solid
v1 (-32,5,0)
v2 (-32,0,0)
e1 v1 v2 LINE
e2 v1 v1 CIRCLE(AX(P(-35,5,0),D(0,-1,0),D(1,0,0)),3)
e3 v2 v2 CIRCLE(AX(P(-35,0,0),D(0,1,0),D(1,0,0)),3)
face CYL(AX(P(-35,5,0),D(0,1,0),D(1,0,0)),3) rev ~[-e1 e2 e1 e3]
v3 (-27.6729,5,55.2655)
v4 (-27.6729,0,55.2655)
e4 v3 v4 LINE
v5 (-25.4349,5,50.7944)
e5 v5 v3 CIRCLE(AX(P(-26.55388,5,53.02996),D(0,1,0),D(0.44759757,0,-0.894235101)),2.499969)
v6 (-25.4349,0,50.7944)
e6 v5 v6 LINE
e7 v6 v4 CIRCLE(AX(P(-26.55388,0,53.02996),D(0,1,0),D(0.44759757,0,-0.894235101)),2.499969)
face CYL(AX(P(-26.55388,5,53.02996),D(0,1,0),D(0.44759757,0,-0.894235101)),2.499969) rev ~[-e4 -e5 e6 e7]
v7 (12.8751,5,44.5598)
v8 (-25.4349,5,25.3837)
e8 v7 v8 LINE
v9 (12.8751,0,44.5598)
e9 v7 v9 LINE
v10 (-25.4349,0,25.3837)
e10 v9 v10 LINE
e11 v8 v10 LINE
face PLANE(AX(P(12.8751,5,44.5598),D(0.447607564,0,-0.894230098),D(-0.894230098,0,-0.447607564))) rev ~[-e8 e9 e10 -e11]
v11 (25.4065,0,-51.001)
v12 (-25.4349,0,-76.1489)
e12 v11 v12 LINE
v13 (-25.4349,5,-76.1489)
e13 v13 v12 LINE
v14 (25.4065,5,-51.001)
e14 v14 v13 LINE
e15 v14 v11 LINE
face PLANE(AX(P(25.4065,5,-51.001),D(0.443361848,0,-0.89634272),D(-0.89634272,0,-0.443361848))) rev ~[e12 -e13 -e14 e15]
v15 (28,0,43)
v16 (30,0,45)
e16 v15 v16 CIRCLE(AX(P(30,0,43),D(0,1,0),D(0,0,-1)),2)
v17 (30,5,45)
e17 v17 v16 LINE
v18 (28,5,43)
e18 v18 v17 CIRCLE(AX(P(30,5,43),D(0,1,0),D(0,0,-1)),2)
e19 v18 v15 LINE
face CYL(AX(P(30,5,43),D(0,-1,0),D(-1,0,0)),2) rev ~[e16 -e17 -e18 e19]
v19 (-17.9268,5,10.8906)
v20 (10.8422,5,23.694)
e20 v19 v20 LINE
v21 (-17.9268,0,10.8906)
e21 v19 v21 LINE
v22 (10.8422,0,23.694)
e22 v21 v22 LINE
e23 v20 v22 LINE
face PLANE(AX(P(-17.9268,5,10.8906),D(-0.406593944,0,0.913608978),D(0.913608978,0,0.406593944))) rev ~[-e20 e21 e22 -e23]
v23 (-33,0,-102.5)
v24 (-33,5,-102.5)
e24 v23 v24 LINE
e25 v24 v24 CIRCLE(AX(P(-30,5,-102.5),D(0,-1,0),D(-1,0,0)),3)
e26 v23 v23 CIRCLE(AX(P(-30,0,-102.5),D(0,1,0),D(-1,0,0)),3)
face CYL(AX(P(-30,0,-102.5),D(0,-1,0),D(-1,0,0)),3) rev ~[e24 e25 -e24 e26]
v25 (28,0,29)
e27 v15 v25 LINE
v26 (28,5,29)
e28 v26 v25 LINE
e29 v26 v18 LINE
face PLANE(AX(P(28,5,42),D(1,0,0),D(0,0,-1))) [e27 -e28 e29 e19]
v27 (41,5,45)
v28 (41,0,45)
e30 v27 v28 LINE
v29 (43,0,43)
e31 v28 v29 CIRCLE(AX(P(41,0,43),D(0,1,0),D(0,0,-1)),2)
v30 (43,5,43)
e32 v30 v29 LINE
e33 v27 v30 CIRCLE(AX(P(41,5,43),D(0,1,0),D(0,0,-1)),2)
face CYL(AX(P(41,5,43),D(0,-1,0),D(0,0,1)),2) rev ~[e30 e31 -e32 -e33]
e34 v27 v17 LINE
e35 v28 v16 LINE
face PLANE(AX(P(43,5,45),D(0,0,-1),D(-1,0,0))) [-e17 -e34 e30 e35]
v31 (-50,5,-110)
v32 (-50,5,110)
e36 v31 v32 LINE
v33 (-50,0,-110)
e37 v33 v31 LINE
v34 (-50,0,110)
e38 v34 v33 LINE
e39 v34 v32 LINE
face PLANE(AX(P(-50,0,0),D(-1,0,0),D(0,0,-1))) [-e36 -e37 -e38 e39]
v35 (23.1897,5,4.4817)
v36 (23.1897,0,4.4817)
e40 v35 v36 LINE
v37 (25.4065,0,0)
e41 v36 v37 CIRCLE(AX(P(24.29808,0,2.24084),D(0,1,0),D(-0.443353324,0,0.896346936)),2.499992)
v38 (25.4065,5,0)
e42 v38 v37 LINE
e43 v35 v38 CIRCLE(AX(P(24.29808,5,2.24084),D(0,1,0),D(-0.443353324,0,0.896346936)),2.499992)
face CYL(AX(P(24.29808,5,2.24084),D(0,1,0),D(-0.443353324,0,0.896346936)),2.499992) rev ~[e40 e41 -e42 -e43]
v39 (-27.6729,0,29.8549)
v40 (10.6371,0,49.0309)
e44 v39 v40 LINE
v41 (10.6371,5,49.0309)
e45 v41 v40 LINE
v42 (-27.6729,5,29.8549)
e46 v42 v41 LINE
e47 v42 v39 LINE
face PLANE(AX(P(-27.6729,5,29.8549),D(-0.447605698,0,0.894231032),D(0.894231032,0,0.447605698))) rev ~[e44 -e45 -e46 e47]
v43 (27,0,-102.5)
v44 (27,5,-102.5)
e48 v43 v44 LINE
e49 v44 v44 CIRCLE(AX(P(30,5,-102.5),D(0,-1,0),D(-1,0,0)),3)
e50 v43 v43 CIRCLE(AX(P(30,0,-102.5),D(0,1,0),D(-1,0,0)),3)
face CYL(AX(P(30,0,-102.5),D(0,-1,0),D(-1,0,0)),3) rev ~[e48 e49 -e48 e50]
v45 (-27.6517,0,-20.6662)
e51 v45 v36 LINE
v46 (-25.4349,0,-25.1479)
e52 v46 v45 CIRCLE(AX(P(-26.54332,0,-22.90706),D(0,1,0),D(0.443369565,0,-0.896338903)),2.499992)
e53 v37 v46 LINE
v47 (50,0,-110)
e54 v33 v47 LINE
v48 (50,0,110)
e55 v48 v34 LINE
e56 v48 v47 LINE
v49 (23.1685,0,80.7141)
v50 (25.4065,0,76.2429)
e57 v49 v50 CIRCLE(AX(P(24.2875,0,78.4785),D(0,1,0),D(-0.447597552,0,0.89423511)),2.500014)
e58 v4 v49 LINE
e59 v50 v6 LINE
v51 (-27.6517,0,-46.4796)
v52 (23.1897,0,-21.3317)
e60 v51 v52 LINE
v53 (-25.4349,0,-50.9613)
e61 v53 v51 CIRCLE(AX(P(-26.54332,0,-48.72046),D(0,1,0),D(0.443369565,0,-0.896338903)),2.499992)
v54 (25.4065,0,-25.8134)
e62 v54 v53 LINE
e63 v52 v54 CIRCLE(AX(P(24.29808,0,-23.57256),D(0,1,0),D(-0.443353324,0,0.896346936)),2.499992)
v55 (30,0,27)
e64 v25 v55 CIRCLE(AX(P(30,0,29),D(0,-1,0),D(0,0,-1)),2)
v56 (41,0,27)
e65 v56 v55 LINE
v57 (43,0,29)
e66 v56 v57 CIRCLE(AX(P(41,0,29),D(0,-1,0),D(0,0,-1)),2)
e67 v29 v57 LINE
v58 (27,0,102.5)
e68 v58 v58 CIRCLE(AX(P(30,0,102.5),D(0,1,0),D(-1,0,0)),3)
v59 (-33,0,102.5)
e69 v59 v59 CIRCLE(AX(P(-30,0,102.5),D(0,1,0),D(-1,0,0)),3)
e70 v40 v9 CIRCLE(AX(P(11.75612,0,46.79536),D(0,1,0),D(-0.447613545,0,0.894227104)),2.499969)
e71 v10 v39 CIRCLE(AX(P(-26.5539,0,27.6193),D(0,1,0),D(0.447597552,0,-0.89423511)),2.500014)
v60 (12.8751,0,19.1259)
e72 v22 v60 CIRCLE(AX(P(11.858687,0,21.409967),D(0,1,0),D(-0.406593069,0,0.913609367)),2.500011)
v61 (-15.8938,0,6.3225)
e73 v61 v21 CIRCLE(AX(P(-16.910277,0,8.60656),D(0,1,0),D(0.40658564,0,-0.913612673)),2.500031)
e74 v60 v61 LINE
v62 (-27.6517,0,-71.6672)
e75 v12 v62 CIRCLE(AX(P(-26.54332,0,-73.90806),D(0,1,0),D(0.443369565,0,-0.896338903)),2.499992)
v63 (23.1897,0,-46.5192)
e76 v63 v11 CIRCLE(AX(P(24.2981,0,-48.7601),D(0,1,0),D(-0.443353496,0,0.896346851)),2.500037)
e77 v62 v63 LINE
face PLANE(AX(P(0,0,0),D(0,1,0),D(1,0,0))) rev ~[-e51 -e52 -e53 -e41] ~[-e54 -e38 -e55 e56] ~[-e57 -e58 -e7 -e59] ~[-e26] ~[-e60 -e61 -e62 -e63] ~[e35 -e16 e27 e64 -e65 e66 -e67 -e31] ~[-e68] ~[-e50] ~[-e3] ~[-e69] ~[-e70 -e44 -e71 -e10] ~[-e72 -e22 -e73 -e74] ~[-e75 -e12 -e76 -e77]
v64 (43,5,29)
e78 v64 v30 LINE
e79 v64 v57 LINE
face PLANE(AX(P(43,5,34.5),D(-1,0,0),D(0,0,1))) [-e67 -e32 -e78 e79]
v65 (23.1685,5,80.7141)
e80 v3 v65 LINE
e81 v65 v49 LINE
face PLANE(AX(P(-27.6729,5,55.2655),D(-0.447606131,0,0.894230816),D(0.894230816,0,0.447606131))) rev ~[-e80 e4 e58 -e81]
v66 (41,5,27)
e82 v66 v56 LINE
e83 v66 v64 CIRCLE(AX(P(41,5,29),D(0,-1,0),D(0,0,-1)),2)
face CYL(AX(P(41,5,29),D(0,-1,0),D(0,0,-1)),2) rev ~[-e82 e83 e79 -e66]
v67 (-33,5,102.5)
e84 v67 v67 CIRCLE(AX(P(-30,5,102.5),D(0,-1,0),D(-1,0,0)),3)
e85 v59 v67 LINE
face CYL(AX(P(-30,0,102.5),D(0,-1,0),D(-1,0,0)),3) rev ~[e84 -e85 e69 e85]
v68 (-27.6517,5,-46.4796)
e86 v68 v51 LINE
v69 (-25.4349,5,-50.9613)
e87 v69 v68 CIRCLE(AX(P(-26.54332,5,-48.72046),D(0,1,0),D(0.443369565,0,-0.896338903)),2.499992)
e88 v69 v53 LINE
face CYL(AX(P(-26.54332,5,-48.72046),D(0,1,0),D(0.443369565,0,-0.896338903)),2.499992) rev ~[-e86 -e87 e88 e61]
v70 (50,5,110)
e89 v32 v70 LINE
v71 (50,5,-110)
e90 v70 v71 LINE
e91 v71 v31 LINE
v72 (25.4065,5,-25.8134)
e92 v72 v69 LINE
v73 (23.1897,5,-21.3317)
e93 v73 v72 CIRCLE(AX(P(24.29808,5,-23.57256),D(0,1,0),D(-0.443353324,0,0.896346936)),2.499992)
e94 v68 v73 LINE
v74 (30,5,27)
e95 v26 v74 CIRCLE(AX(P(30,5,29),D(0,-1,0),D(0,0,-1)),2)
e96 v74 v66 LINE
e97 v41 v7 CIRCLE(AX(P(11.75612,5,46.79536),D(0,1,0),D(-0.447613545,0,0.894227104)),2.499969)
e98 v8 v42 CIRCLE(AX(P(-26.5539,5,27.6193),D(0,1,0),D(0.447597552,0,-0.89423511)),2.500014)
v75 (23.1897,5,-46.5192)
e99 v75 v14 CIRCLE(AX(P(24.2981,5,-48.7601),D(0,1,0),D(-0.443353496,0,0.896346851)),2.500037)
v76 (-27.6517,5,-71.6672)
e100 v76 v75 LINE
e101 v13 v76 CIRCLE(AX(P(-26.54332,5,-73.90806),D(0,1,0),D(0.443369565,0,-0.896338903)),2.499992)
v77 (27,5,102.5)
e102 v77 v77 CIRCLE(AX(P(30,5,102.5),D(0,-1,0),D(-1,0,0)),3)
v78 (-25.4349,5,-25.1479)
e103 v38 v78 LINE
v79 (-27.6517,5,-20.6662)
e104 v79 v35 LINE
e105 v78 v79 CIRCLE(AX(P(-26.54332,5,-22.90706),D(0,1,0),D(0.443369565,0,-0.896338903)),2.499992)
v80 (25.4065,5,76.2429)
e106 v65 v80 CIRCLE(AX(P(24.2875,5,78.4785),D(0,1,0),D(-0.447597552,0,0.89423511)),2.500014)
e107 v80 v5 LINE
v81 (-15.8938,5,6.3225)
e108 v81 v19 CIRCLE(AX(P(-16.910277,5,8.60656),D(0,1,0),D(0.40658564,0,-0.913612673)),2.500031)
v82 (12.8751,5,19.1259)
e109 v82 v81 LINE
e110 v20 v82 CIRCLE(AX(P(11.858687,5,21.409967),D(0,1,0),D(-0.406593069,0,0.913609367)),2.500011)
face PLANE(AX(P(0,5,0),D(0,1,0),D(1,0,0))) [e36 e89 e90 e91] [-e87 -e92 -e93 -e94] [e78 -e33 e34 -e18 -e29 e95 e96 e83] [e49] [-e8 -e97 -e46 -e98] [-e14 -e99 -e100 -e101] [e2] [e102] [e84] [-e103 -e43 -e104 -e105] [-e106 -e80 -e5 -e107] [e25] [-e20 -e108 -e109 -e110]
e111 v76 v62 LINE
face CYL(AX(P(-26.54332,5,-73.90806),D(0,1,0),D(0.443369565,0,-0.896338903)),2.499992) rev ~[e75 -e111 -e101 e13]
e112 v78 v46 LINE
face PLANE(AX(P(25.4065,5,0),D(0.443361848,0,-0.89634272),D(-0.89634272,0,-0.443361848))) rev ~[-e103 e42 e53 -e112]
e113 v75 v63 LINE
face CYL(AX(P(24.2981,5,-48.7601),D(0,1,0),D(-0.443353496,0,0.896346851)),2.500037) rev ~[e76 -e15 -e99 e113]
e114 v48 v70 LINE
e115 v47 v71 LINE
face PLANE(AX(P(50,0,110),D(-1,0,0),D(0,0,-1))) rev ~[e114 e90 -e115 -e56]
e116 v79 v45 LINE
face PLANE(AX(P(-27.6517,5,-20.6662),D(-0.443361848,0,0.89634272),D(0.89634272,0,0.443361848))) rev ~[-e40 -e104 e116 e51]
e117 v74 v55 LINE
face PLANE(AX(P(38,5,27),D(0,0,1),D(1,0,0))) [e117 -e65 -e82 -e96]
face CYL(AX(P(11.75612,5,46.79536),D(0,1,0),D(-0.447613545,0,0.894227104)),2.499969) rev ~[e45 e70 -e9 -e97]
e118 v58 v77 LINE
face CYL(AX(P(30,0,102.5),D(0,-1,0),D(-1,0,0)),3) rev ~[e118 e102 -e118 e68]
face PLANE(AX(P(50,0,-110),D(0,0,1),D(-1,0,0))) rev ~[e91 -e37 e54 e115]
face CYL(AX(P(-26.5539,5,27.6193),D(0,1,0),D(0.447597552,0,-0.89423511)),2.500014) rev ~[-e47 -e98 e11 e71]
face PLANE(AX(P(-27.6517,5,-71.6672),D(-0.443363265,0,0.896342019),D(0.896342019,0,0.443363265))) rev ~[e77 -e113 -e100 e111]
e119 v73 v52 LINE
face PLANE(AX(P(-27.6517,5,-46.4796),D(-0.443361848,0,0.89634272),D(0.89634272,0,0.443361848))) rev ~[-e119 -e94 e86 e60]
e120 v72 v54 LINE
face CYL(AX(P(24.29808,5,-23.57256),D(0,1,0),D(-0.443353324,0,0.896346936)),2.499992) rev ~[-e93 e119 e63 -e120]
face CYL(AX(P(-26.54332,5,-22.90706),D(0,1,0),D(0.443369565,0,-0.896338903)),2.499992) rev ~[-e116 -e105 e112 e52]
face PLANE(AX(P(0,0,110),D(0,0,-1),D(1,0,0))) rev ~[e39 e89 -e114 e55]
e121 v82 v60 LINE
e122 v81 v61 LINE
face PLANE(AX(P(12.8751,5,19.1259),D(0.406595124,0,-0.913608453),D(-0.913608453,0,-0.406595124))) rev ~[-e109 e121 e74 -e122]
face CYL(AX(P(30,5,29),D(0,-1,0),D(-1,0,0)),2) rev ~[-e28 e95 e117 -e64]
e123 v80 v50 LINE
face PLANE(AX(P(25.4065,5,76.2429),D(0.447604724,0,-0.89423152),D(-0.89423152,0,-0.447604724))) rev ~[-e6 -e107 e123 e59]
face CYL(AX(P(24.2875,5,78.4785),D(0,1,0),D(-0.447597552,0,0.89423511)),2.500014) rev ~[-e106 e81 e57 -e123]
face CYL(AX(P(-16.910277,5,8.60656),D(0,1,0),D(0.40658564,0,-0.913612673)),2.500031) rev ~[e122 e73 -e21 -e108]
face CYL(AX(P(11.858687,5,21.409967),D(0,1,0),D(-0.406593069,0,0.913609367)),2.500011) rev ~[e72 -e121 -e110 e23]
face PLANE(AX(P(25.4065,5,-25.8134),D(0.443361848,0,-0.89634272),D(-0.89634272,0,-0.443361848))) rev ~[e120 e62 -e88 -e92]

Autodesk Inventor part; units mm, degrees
ref_plane "YZ Plane" through (0, 0, 0) normal (1, 0, 0) x (0, 1, 0)
ref_plane "XZ Plane" through (0, 0, 0) normal (0, 1, 0) x (-1, 0, 0)
ref_plane "XY Plane" through (0, 0, 0) normal (0, 0, 1) x (1, 0, 0)
sketch "Sketch1" plane through (0, 0, 0) normal (0, 1, 0) x (-1, 0, 0)
  line L0 (0, 0) -> (0, 110)
  line L1 (0, 110) -> (50, 110)
  line L2 (50, 110) -> (50, -110)
  line L3 (50, -110) -> (0, -110)
  line L4 (0, -110) -> (0, 0)
  line L5 (50, 0) -> (0, 0)
  line L6 (50, 110) -> (50, 102.5)
  line L7 (50, 102.5) -> (30, 102.5)
  line L8 (0, 110) -> (-50, 110)
  line L9 (-50, 110) -> (-50, -110)
  line L10 (-50, -110) -> (0, -110)
  circle A0 centre (30, 102.5) radius 3
  line L11 (30, 102.5) -> (-30, 102.5)
  circle A1 centre (-30, 102.5) radius 3
  circle A2 centre (30, -102.5) radius 3
  circle A3 centre (-30, -102.5) radius 3
  line L12 (30, 102.5) -> (30, -102.5)
  line L13 (-30, 102.5) -> (-30, -102.5)
  line L14 (30, 76.2) -> (-30, 50.8) construction
  line L15 (28.0508, 80.8044) -> (-31.9492, 55.4044)
  line L16 (-28.0508, 46.1956) -> (31.9492, 71.5956)
  arc A4 (31.9492, 71.5956) -> (28.0508, 80.8044) centre (30, 76.2) ccw
  arc A5 (-31.9492, 55.4044) -> (-28.0508, 46.1956) centre (-30, 50.8) ccw
  line L17 (30, 50.8) -> (-30, 25.4) construction
  line L18 (28.0508, 55.4044) -> (-31.9492, 30.0044)
  line L19 (-28.0508, 20.7956) -> (31.9492, 46.1956)
  arc A6 (31.9492, 46.1956) -> (28.0508, 55.4044) centre (30, 50.8) ccw
  arc A7 (-31.9492, 30.0044) -> (-28.0508, 20.7956) centre (-30, 25.4) ccw
  line L20 (30, 25.4) -> (-30, 0) construction
  line L21 (28.0508, 30.0044) -> (-31.9492, 4.6044)
  line L22 (-28.0508, -4.6044) -> (31.9492, 20.7956)
  arc A8 (31.9492, 20.7956) -> (28.0508, 30.0044) centre (30, 25.4) ccw
  arc A9 (-31.9492, 4.6044) -> (-28.0508, -4.6044) centre (-30, 0) ccw
  line L23 (30, 0) -> (-30, -25.4) construction
  line L24 (28.0508, 4.6044) -> (-31.9492, -20.7956)
  line L25 (-28.0508, -30.0044) -> (31.9492, -4.6044)
  arc A10 (31.9492, -4.6044) -> (28.0508, 4.6044) centre (30, 0) ccw
  arc A11 (-31.9492, -20.7956) -> (-28.0508, -30.0044) centre (-30, -25.4) ccw
  line L26 (30, -25.4) -> (-30, -50.8) construction
  line L27 (28.0508, -20.7956) -> (-31.9492, -46.1956)
  line L28 (-28.0508, -55.4044) -> (31.9492, -30.0044)
  arc A12 (31.9492, -30.0044) -> (28.0508, -20.7956) centre (30, -25.4) ccw
  arc A13 (-31.9492, -46.1956) -> (-28.0508, -55.4044) centre (-30, -50.8) ccw
  line L29 (30, -50.8) -> (-30, -76.2) construction
  line L30 (28.0508, -46.1956) -> (-31.9492, -71.5956)
  line L31 (-28.0508, -80.8044) -> (31.9492, -55.4044)
  arc A14 (31.9492, -55.4044) -> (28.0508, -46.1956) centre (30, -50.8) ccw
  arc A15 (-31.9492, -71.5956) -> (-28.0508, -80.8044) centre (-30, -76.2) ccw
  point P0 (0, 63.5)
  point P1 (0, 38.1)
  point P2 (0, 12.7)
  point P3 (0, -12.7)
  point P4 (0, -38.1)
  point P5 (0, -63.5)
  dimension "d0" = 110
  dimension "d1" = 50
  dimension "d2" = 220
  dimension "d3" = 7.5
  dimension "d4" = 20
  dimension "d5" = 50
  dimension "d6" = 6
  dimension "d7" = 60
  dimension "d8" = 6
  dimension "d9" = 10
  dimension "d10" = 10
  dimension "d11" = 10
  dimension "d12" = 10
  dimension "d13" = 10
  dimension "d14" = 10
extrude "Extrusion1" add sketch "Sketch1" along normal blind 5 contours L4 L24 L13 A9 L22 L0 | L5 L24 L4 | L0 L22 L12 A10 L24 L5 | L21 L13 A7 L19 L0 | L0 L19 L12 A8 L21 | L22 A8 L12 L19 A6 L16 A4 A0 L7 L2 L5 A10 | L25 L12 A12 L27 L4 | L4 L27 L13 A11 L25 | L24 A11 L13 L27 A13 L30 A15 L31 L4 L10 L9 L8 L0 L11 A1 L15 A5 L18 A7 L21 A9 | L25 A10 L5 L2 L3 L4 L31 A14 L12 L28 A12 | L18 L13 A5 L16 L0 | L0 L16 L12 A6 L18 | L28 L12 A14 L30 L4 | L4 L30 L13 A13 L28 | L7 A0 L11 L0 L1 L2 | L15 L13 A1 L11 L0 | L0 L11 A0 L12 A4 L15
sketch "Sketch2" plane through (0, 5, 0) normal (0, 1, 0) x (1, 0, 0)
  line L0 (31.9492, -55.4044) -> (-28.0508, -80.8044) projected
  line L1 (-28.0508, -80.8044) -> (31.9492, -55.4044)
  line L2 (-31.9492, -71.5956) -> (28.0508, -46.1956) projected
  line L3 (-31.9492, -71.5956) -> (28.0508, -46.1956)
  arc A0 (31.9492, -55.4044) -> (28.0508, -46.1956) centre (30, -50.8) ccw projected
  arc A1 (31.9492, -55.4044) -> (28.0508, -46.1956) centre (30, -50.8) ccw
  arc A2 (-31.9492, -71.5956) -> (-28.0508, -80.8044) centre (-30, -76.2) ccw projected
  arc A3 (-31.9492, -71.5956) -> (-28.0508, -80.8044) centre (-30, -76.2) ccw
  arc A4 (-31.9492, -46.1956) -> (-28.0508, -55.4044) centre (-30, -50.8) ccw projected
  arc A5 (-31.9492, -46.1956) -> (-28.0508, -55.4044) centre (-30, -50.8) ccw
  arc A6 (31.9492, -30.0044) -> (28.0508, -20.7956) centre (30, -25.4) ccw projected
  arc A7 (31.9492, -30.0044) -> (28.0508, -20.7956) centre (30, -25.4) ccw
  line L4 (31.9492, -30.0044) -> (-28.0508, -55.4044)
  line L5 (-31.9492, -46.1956) -> (28.0508, -20.7956)
  point P0 (0, 0)
extrude "Extrusion2" add sketch "Sketch2" against normal blind 5
sketch "Sketch3" plane through (0, 5, 0) normal (0, 1, 0) x (1, 0, 0)
  line L0 (50, -110) -> (50, 110) projected
  line L1 (-50, -110) -> (50, -110) projected
  line L2 (50, -110) -> (-50, -110)
  line L3 (50, -110) -> (25, -110)
  line L4 (25, -110) -> (25, -50)
  line L5 (25, -50) -> (17.5, -50)
  line L6 (17.5, -50) -> (17.5, -35)
  line L7 (17.5, -35) -> (32.5, -35)
  line L8 (32.5, -35) -> (32.5, -50)
  line L9 (32.5, -50) -> (25, -50)
  line L10 (-25.409, -50.782) -> (-0.009, -38.082) construction
  line L11 (-23.1729, -55.2541) -> (2.2271, -42.5541)
  line L12 (-2.2451, -33.6099) -> (-27.6451, -46.3099)
  arc A0 (-27.6451, -46.3099) -> (-23.1729, -55.2541) centre (-25.409, -50.782) ccw
  arc A1 (2.2271, -42.5541) -> (-2.2451, -33.6099) centre (-0.009, -38.082) ccw
  line L13 (-25.409, -76.2) -> (-0.009, -63.5) construction
  line L14 (-23.1729, -80.6721) -> (2.2271, -67.9721)
  line L15 (-2.2451, -59.0279) -> (-27.6451, -71.7279)
  arc A2 (-27.6451, -71.7279) -> (-23.1729, -80.6721) centre (-25.409, -76.2) ccw
  arc A3 (2.2271, -67.9721) -> (-2.2451, -59.0279) centre (-0.009, -63.5) ccw
  point P0 (0, 0)
  point P1 (-12.709, -44.432)
  point P2 (-12.709, -69.85)
  dimension "d19" = 25
  dimension "d20" = 60
  dimension "d21" = 7.5
  dimension "d22" = 15
  dimension "d23" = 15
  dimension "d24" = 10
  dimension "d25" = 10
extrude "Extrusion3" cut sketch "Sketch3" against normal blind 5
fillet "Face Fillet1" radius 2 1 edges at (17.5, 2.5, 50)
fillet "Face Fillet2" radius 2 1 edges at (32.5, 2.5, 50)
fillet "Face Fillet3" radius 2 1 edges at (17.5, 2.5, 35)
fillet "Face Fillet4" radius 2 1 edges at (32.5, 2.5, 35)
sketch "Sketch4" plane through (0, 5, 0) normal (0, 1, 0) x (1, 0, 0)
  line L0 (-31.9492, 4.6044) -> (28.0508, 30.0044) projected
  line L1 (-31.9492, 4.6044) -> (28.0508, 30.0044)
  line L2 (31.9492, 20.7956) -> (-28.0508, -4.6044) projected
  line L3 (31.9492, 20.7956) -> (-28.0508, -4.6044)
  arc A0 (-31.9492, 4.6044) -> (-28.0508, -4.6044) centre (-30, 0) ccw
  arc A1 (31.9492, 20.7956) -> (28.0508, 30.0044) centre (30, 25.4) ccw projected
  arc A2 (31.9492, 20.7956) -> (28.0508, 30.0044) centre (30, 25.4) ccw
  point P0 (0, 0)
extrude "Extrusion4" add sketch "Sketch4" against normal blind 5
sketch "Sketch5" plane through (0, 5, 0) normal (0, 1, 0) x (1, 0, 0)
  line L0 (-50, 110) -> (-50, -110) projected
  line L1 (-50, -110) -> (-50, 0)
  line L2 (-50, 0) -> (-35, 0)
  circle A0 centre (-35, 0) radius 3
  line L3 (25.3921, 25.4185) -> (-19.0579, 6.3685) construction
  line L4 (23.4225, 30.0142) -> (-21.0275, 10.9642)
  line L5 (-17.0883, 1.7728) -> (27.3617, 20.8228)
  arc A1 (27.3617, 20.8228) -> (23.4225, 30.0142) centre (25.3921, 25.4185) ccw
  arc A2 (-21.0275, 10.9642) -> (-17.0883, 1.7728) centre (-19.0579, 6.3685) ccw
  point P0 (0, 0)
  point P1 (3.1671, 15.8935)
  dimension "d34" = 15
  dimension "d35" = 6
  dimension "d36" = 10
extrude "Extrusion5" cut sketch "Sketch5" against normal blind 5
sketch "Sketch6" plane through (0, 5, 0) normal (0, 1, 0) x (1, 0, 0)
  circle A0 centre (30, -102.5) radius 3 projected
  line L0 (30, -102.5) -> (30, -95)
  line L1 (30, -95) -> (30, -42)
  line L2 (30, -42) -> (40, -42)
  line L3 (40, -42) -> (25, -42)
  line L4 (25, -42) -> (25, -27)
  line L5 (25, -27) -> (40, -27)
  line L6 (40, -27) -> (40, -42)
  line L7 (32.5, -48) -> (32.5, -42)
  line L8 (32.5, -37) -> (32.5, -48) projected
  line L9 (19.5, -35) -> (30.5, -35) projected
  line L10 (25, -35) -> (19.5, -35)
  line L11 (30.5, -50) -> (19.5, -50)
  line L12 (17.5, -48) -> (17.5, -37)
  arc A1 (19.5, -35) -> (17.5, -37) centre (19.5, -37) ccw projected
  arc A2 (17.5, -48) -> (19.5, -50) centre (19.5, -48) ccw projected
  arc A3 (17.5, -48) -> (19.5, -50) centre (19.5, -48) ccw
  arc A4 (19.5, -35) -> (17.5, -37) centre (19.5, -37) ccw
  arc A5 (30.5, -50) -> (32.5, -48) centre (30.5, -48) ccw projected
  arc A6 (30.5, -50) -> (32.5, -48) centre (30.5, -48) ccw
  line L13 (40, -27) -> (43, -27)
  line L14 (43, -27) -> (43, -45)
  line L15 (43, -45) -> (25, -45)
  line L16 (25, -45) -> (25, -27)
  point P0 (0, 0)
  dimension "d39" = 7.5
  dimension "d40" = 53
  dimension "d41" = 10
  dimension "d42" = 15
  dimension "d43" = 15
  dimension "d50" = 3
  dimension "d51" = 18
extrude "Extrusion6" cut sketch "Sketch6" against normal blind 5 contours L3 L4 L5 L6 L2
sketch "Sketch7" plane through (0, 5, 0) normal (0, 1, 0) x (1, 0, 0)
  line L0 (32.5, -42) -> (40, -42) projected
  line L1 (40, -42) -> (25, -42)
  line L2 (40, -27) -> (25, -27) projected
  line L3 (25, -42) -> (25, -27)
  line L4 (32.5, -42) -> (32.5, -48) projected
  line L5 (32.5, -42) -> (32.5, -48)
  line L6 (19.5, -35) -> (25, -35) projected
  line L7 (25, -35) -> (19.5, -35)
  arc A0 (19.5, -35) -> (17.5, -37) centre (19.5, -37) ccw projected
  line L8 (17.5, -37) -> (17.5, -48)
  line L9 (30.5, -50) -> (19.5, -50) projected
  line L10 (19.5, -50) -> (30.5, -50)
  arc A1 (17.5, -48) -> (19.5, -50) centre (19.5, -48) ccw projected
  arc A2 (17.5, -48) -> (19.5, -50) centre (19.5, -48) ccw
  arc A3 (19.5, -35) -> (17.5, -37) centre (19.5, -37) ccw
  arc A4 (30.5, -50) -> (32.5, -48) centre (30.5, -48) ccw
  point P0 (0, 0)
  dimension "d46" = 15
extrude "Extrusion7" add sketch "Sketch7" against normal blind 5
fillet "Fillet1" radius 2 4 edges at (25, 2.5, 42) (25, 2.5, 27) (40, 2.5, 42) (40, 2.5, 27)
sketch "Sketch8" plane through (0, 5, 0) normal (0, 1, 0) x (1, 0, 0)
  line L0 (40, -29) -> (40, -40) projected
  line L1 (40, -34.5) -> (43, -34.5)
  line L2 (38, -27) -> (27, -27) projected
  line L3 (32.5, -27) -> (49.9944, -27)
  line L4 (43, -34.5) -> (43, -27)
  line L5 (43, -27) -> (43, -45)
  line L6 (43, -45) -> (25, -45)
  line L7 (25, -45) -> (25, -27)
  line L8 (25, -27) -> (43, -27)
  line L9 (43, -45) -> (28, -45)
  line L10 (28, -45) -> (28, -27)
  point P0 (0, 0)
  dimension "d52" = 3
  dimension "d53" = 18
  dimension "d54" = 18
  dimension "d55" = 15
extrude "Extrusion8" cut sketch "Sketch8" against normal blind 10 contours L3 L4 L5 L6 L10 L2
sketch "Sketch9" plane through (0, 5, 0) normal (0, 1, 0) x (1, 0, 0)
  line L0 (27, -42) -> (28, -42) projected
  line L1 (28, -42) -> (28, -27)
  line L2 (43, -27) -> (27, -27) projected
  line L3 (28, -42) -> (28, -45) projected
  line L4 (28, -42) -> (27, -42)
  line L5 (28, -27) -> (27, -27)
  line L6 (25, -29) -> (25, -40) projected
  line L7 (25, -40) -> (25, -29)
  arc A0 (25, -40) -> (27, -42) centre (27, -40) ccw projected
  arc A1 (25, -40) -> (27, -42) centre (27, -40) ccw
  arc A2 (27, -27) -> (25, -29) centre (27, -29) ccw
  point P0 (0, 0)
extrude "Extrusion9" add sketch "Sketch9" against normal blind 5
fillet "Fillet2" radius 2 4 edges at (28, 2.5, 45) (28, 2.5, 27) (43, 2.5, 45) (43, 2.5, 27)
sketch "Sketch10" plane through (0, 5, 0) normal (0, 1, 0) x (1, 0, 0)
  arc A0 (2.2271, -67.9721) -> (-2.2451, -59.0279) centre (-0.009, -63.5) ccw projected
  line L0 (-23.1729, -55.2541) -> (2.2271, -42.5541) projected
  line L1 (-23.1729, -55.2541) -> (2.2271, -42.5541)
  line L2 (-2.2451, -33.6099) -> (-27.6451, -46.3099) projected
  line L3 (-27.6451, -46.3099) -> (-2.2451, -33.6099)
  line L4 (31.9492, -4.6044) -> (-28.0508, -30.0044) projected
  line L5 (-28.0508, -30.0044) -> (31.9492, -4.6044)
  line L6 (-31.9492, -20.7956) -> (28.0508, 4.6044) projected
  line L7 (-31.9492, -20.7956) -> (28.0508, 4.6044)
  line L8 (-17.0883, 1.7728) -> (27.3617, 20.8228) projected
  line L9 (-17.0883, 1.7728) -> (27.3617, 20.8228)
  line L10 (23.4225, 30.0142) -> (-21.0275, 10.9642) projected
  line L11 (-21.0275, 10.9642) -> (23.4225, 30.0142)
  line L12 (31.9492, 46.1956) -> (-28.0508, 20.7956) projected
  line L13 (-28.0508, 20.7956) -> (31.9492, 46.1956)
  line L14 (-31.9492, 30.0044) -> (28.0508, 55.4044) projected
  line L15 (-31.9492, 30.0044) -> (28.0508, 55.4044)
  line L16 (31.9492, 71.5956) -> (-28.0508, 46.1956) projected
  line L17 (-28.0508, 46.1956) -> (31.9492, 71.5956)
  line L18 (-31.9492, 55.4044) -> (28.0508, 80.8044) projected
  line L19 (-31.9492, 55.4044) -> (28.0508, 80.8044)
  arc A1 (2.2271, -67.9721) -> (-2.2451, -59.0279) centre (-0.009, -63.5) ccw
  arc A2 (-27.6451, -46.3099) -> (-23.1729, -55.2541) centre (-25.409, -50.782) ccw
  arc A3 (2.2271, -42.5541) -> (-2.2451, -33.6099) centre (-0.009, -38.082) ccw
  arc A4 (-31.9492, -20.7956) -> (-28.0508, -30.0044) centre (-30, -25.4) ccw
  arc A5 (31.9492, -4.6044) -> (28.0508, 4.6044) centre (30, 0) ccw
  arc A6 (-21.0275, 10.9642) -> (-17.0883, 1.7728) centre (-19.0579, 6.3685) ccw
  arc A7 (-27.6451, -71.7279) -> (-23.1729, -80.6721) centre (-25.409, -76.2) ccw projected
  arc A8 (-27.6451, -71.7279) -> (-23.1729, -80.6721) centre (-25.409, -76.2) ccw
  line L20 (-23.1729, -80.6721) -> (2.2271, -67.9721) projected
  line L21 (-23.1729, -80.6721) -> (2.2271, -67.9721)
  line L22 (-27.6451, -71.7279) -> (-2.2451, -59.0279)
  arc A9 (-27.6451, -46.3099) -> (-23.1729, -55.2541) centre (-25.409, -50.782) ccw
  arc A10 (-31.9492, 30.0044) -> (-28.0508, 20.7956) centre (-30, 25.4) ccw
  arc A11 (-31.9492, 55.4044) -> (-28.0508, 46.1956) centre (-30, 50.8) ccw projected
  arc A12 (-31.9492, 55.4044) -> (-28.0508, 46.1956) centre (-30, 50.8) ccw
  arc A13 (31.9492, 71.5956) -> (28.0508, 80.8044) centre (30, 76.2) ccw
  arc A14 (27.3617, 20.8228) -> (23.4225, 30.0142) centre (25.3921, 25.4185) ccw
  arc A15 (31.9492, 46.1956) -> (28.0508, 55.4044) centre (30, 50.8) ccw
  point P0 (0, 0)
extrude "Extrusion10" add sketch "Sketch10" against normal blind 5
sketch "Sketch11" plane through (0, 5, 0) normal (0, 1, 0) x (1, 0, 0)
  line L0 (-26.5539, -53.0299) -> (24.2875, -78.4785) construction
  line L1 (-27.6729, -55.2655) -> (23.1685, -80.7141)
  line L2 (25.4065, -76.2429) -> (-25.4349, -50.7944)
  arc A0 (-25.4349, -50.7944) -> (-27.6729, -55.2655) centre (-26.5539, -53.0299) ccw
  arc A1 (23.1685, -80.7141) -> (25.4065, -76.2429) centre (24.2875, -78.4785) ccw
  line L3 (-26.5539, -27.6193) -> (11.7561, -46.7953) construction
  line L4 (-27.6729, -29.8549) -> (10.6371, -49.0309)
  line L5 (12.8751, -44.5598) -> (-25.4349, -25.3837)
  arc A2 (-25.4349, -25.3837) -> (-27.6729, -29.8549) centre (-26.5539, -27.6193) ccw
  arc A3 (10.6371, -49.0309) -> (12.8751, -44.5598) centre (11.7561, -46.7953) ccw
  line L6 (-16.9103, -8.6065) -> (11.8587, -21.41) construction
  line L7 (-17.9268, -10.8906) -> (10.8422, -23.694)
  line L8 (12.8751, -19.1259) -> (-15.8938, -6.3225)
  arc A4 (-15.8938, -6.3225) -> (-17.9268, -10.8906) centre (-16.9103, -8.6065) ccw
  arc A5 (10.8422, -23.694) -> (12.8751, -19.1259) centre (11.8587, -21.41) ccw
  line L9 (-26.5433, 22.907) -> (24.2981, -2.2409) construction
  line L10 (-27.6517, 20.6662) -> (23.1897, -4.4817)
  line L11 (25.4065, 0) -> (-25.4349, 25.1479)
  arc A6 (-25.4349, 25.1479) -> (-27.6517, 20.6662) centre (-26.5433, 22.907) ccw
  arc A7 (23.1897, -4.4817) -> (25.4065, 0) centre (24.2981, -2.2409) ccw
  line L12 (-26.5433, 48.7204) -> (24.2981, 23.5725) construction
  line L13 (-27.6517, 46.4796) -> (23.1897, 21.3317)
  line L14 (25.4065, 25.8134) -> (-25.4349, 50.9613)
  arc A8 (-25.4349, 50.9613) -> (-27.6517, 46.4796) centre (-26.5433, 48.7204) ccw
  arc A9 (23.1897, 21.3317) -> (25.4065, 25.8134) centre (24.2981, 23.5725) ccw
  line L15 (-26.5433, 73.908) -> (24.2981, 48.7601) construction
  line L16 (-27.6517, 71.6672) -> (23.1897, 46.5192)
  line L17 (25.4065, 51.001) -> (-25.4349, 76.1489)
  arc A10 (-25.4349, 76.1489) -> (-27.6517, 71.6672) centre (-26.5433, 73.908) ccw
  arc A11 (23.1897, 46.5192) -> (25.4065, 51.001) centre (24.2981, 48.7601) ccw
  point P0 (0, 0)
  point P1 (-1.1332, -65.7542)
  point P2 (-7.3989, -37.2073)
  point P3 (-2.5258, -15.0082)
  point P4 (-1.1226, 10.3331)
  point P5 (-1.1226, 36.1465)
  point P6 (-1.1226, 61.3341)
  dimension "d63" = 5
  dimension "d64" = 5
  dimension "d65" = 5
  dimension "d66" = 5
  dimension "d67" = 5
  dimension "d68" = 5
extrude "Extrusion11" cut sketch "Sketch11" against normal blind 5
properties part number "left_side"
